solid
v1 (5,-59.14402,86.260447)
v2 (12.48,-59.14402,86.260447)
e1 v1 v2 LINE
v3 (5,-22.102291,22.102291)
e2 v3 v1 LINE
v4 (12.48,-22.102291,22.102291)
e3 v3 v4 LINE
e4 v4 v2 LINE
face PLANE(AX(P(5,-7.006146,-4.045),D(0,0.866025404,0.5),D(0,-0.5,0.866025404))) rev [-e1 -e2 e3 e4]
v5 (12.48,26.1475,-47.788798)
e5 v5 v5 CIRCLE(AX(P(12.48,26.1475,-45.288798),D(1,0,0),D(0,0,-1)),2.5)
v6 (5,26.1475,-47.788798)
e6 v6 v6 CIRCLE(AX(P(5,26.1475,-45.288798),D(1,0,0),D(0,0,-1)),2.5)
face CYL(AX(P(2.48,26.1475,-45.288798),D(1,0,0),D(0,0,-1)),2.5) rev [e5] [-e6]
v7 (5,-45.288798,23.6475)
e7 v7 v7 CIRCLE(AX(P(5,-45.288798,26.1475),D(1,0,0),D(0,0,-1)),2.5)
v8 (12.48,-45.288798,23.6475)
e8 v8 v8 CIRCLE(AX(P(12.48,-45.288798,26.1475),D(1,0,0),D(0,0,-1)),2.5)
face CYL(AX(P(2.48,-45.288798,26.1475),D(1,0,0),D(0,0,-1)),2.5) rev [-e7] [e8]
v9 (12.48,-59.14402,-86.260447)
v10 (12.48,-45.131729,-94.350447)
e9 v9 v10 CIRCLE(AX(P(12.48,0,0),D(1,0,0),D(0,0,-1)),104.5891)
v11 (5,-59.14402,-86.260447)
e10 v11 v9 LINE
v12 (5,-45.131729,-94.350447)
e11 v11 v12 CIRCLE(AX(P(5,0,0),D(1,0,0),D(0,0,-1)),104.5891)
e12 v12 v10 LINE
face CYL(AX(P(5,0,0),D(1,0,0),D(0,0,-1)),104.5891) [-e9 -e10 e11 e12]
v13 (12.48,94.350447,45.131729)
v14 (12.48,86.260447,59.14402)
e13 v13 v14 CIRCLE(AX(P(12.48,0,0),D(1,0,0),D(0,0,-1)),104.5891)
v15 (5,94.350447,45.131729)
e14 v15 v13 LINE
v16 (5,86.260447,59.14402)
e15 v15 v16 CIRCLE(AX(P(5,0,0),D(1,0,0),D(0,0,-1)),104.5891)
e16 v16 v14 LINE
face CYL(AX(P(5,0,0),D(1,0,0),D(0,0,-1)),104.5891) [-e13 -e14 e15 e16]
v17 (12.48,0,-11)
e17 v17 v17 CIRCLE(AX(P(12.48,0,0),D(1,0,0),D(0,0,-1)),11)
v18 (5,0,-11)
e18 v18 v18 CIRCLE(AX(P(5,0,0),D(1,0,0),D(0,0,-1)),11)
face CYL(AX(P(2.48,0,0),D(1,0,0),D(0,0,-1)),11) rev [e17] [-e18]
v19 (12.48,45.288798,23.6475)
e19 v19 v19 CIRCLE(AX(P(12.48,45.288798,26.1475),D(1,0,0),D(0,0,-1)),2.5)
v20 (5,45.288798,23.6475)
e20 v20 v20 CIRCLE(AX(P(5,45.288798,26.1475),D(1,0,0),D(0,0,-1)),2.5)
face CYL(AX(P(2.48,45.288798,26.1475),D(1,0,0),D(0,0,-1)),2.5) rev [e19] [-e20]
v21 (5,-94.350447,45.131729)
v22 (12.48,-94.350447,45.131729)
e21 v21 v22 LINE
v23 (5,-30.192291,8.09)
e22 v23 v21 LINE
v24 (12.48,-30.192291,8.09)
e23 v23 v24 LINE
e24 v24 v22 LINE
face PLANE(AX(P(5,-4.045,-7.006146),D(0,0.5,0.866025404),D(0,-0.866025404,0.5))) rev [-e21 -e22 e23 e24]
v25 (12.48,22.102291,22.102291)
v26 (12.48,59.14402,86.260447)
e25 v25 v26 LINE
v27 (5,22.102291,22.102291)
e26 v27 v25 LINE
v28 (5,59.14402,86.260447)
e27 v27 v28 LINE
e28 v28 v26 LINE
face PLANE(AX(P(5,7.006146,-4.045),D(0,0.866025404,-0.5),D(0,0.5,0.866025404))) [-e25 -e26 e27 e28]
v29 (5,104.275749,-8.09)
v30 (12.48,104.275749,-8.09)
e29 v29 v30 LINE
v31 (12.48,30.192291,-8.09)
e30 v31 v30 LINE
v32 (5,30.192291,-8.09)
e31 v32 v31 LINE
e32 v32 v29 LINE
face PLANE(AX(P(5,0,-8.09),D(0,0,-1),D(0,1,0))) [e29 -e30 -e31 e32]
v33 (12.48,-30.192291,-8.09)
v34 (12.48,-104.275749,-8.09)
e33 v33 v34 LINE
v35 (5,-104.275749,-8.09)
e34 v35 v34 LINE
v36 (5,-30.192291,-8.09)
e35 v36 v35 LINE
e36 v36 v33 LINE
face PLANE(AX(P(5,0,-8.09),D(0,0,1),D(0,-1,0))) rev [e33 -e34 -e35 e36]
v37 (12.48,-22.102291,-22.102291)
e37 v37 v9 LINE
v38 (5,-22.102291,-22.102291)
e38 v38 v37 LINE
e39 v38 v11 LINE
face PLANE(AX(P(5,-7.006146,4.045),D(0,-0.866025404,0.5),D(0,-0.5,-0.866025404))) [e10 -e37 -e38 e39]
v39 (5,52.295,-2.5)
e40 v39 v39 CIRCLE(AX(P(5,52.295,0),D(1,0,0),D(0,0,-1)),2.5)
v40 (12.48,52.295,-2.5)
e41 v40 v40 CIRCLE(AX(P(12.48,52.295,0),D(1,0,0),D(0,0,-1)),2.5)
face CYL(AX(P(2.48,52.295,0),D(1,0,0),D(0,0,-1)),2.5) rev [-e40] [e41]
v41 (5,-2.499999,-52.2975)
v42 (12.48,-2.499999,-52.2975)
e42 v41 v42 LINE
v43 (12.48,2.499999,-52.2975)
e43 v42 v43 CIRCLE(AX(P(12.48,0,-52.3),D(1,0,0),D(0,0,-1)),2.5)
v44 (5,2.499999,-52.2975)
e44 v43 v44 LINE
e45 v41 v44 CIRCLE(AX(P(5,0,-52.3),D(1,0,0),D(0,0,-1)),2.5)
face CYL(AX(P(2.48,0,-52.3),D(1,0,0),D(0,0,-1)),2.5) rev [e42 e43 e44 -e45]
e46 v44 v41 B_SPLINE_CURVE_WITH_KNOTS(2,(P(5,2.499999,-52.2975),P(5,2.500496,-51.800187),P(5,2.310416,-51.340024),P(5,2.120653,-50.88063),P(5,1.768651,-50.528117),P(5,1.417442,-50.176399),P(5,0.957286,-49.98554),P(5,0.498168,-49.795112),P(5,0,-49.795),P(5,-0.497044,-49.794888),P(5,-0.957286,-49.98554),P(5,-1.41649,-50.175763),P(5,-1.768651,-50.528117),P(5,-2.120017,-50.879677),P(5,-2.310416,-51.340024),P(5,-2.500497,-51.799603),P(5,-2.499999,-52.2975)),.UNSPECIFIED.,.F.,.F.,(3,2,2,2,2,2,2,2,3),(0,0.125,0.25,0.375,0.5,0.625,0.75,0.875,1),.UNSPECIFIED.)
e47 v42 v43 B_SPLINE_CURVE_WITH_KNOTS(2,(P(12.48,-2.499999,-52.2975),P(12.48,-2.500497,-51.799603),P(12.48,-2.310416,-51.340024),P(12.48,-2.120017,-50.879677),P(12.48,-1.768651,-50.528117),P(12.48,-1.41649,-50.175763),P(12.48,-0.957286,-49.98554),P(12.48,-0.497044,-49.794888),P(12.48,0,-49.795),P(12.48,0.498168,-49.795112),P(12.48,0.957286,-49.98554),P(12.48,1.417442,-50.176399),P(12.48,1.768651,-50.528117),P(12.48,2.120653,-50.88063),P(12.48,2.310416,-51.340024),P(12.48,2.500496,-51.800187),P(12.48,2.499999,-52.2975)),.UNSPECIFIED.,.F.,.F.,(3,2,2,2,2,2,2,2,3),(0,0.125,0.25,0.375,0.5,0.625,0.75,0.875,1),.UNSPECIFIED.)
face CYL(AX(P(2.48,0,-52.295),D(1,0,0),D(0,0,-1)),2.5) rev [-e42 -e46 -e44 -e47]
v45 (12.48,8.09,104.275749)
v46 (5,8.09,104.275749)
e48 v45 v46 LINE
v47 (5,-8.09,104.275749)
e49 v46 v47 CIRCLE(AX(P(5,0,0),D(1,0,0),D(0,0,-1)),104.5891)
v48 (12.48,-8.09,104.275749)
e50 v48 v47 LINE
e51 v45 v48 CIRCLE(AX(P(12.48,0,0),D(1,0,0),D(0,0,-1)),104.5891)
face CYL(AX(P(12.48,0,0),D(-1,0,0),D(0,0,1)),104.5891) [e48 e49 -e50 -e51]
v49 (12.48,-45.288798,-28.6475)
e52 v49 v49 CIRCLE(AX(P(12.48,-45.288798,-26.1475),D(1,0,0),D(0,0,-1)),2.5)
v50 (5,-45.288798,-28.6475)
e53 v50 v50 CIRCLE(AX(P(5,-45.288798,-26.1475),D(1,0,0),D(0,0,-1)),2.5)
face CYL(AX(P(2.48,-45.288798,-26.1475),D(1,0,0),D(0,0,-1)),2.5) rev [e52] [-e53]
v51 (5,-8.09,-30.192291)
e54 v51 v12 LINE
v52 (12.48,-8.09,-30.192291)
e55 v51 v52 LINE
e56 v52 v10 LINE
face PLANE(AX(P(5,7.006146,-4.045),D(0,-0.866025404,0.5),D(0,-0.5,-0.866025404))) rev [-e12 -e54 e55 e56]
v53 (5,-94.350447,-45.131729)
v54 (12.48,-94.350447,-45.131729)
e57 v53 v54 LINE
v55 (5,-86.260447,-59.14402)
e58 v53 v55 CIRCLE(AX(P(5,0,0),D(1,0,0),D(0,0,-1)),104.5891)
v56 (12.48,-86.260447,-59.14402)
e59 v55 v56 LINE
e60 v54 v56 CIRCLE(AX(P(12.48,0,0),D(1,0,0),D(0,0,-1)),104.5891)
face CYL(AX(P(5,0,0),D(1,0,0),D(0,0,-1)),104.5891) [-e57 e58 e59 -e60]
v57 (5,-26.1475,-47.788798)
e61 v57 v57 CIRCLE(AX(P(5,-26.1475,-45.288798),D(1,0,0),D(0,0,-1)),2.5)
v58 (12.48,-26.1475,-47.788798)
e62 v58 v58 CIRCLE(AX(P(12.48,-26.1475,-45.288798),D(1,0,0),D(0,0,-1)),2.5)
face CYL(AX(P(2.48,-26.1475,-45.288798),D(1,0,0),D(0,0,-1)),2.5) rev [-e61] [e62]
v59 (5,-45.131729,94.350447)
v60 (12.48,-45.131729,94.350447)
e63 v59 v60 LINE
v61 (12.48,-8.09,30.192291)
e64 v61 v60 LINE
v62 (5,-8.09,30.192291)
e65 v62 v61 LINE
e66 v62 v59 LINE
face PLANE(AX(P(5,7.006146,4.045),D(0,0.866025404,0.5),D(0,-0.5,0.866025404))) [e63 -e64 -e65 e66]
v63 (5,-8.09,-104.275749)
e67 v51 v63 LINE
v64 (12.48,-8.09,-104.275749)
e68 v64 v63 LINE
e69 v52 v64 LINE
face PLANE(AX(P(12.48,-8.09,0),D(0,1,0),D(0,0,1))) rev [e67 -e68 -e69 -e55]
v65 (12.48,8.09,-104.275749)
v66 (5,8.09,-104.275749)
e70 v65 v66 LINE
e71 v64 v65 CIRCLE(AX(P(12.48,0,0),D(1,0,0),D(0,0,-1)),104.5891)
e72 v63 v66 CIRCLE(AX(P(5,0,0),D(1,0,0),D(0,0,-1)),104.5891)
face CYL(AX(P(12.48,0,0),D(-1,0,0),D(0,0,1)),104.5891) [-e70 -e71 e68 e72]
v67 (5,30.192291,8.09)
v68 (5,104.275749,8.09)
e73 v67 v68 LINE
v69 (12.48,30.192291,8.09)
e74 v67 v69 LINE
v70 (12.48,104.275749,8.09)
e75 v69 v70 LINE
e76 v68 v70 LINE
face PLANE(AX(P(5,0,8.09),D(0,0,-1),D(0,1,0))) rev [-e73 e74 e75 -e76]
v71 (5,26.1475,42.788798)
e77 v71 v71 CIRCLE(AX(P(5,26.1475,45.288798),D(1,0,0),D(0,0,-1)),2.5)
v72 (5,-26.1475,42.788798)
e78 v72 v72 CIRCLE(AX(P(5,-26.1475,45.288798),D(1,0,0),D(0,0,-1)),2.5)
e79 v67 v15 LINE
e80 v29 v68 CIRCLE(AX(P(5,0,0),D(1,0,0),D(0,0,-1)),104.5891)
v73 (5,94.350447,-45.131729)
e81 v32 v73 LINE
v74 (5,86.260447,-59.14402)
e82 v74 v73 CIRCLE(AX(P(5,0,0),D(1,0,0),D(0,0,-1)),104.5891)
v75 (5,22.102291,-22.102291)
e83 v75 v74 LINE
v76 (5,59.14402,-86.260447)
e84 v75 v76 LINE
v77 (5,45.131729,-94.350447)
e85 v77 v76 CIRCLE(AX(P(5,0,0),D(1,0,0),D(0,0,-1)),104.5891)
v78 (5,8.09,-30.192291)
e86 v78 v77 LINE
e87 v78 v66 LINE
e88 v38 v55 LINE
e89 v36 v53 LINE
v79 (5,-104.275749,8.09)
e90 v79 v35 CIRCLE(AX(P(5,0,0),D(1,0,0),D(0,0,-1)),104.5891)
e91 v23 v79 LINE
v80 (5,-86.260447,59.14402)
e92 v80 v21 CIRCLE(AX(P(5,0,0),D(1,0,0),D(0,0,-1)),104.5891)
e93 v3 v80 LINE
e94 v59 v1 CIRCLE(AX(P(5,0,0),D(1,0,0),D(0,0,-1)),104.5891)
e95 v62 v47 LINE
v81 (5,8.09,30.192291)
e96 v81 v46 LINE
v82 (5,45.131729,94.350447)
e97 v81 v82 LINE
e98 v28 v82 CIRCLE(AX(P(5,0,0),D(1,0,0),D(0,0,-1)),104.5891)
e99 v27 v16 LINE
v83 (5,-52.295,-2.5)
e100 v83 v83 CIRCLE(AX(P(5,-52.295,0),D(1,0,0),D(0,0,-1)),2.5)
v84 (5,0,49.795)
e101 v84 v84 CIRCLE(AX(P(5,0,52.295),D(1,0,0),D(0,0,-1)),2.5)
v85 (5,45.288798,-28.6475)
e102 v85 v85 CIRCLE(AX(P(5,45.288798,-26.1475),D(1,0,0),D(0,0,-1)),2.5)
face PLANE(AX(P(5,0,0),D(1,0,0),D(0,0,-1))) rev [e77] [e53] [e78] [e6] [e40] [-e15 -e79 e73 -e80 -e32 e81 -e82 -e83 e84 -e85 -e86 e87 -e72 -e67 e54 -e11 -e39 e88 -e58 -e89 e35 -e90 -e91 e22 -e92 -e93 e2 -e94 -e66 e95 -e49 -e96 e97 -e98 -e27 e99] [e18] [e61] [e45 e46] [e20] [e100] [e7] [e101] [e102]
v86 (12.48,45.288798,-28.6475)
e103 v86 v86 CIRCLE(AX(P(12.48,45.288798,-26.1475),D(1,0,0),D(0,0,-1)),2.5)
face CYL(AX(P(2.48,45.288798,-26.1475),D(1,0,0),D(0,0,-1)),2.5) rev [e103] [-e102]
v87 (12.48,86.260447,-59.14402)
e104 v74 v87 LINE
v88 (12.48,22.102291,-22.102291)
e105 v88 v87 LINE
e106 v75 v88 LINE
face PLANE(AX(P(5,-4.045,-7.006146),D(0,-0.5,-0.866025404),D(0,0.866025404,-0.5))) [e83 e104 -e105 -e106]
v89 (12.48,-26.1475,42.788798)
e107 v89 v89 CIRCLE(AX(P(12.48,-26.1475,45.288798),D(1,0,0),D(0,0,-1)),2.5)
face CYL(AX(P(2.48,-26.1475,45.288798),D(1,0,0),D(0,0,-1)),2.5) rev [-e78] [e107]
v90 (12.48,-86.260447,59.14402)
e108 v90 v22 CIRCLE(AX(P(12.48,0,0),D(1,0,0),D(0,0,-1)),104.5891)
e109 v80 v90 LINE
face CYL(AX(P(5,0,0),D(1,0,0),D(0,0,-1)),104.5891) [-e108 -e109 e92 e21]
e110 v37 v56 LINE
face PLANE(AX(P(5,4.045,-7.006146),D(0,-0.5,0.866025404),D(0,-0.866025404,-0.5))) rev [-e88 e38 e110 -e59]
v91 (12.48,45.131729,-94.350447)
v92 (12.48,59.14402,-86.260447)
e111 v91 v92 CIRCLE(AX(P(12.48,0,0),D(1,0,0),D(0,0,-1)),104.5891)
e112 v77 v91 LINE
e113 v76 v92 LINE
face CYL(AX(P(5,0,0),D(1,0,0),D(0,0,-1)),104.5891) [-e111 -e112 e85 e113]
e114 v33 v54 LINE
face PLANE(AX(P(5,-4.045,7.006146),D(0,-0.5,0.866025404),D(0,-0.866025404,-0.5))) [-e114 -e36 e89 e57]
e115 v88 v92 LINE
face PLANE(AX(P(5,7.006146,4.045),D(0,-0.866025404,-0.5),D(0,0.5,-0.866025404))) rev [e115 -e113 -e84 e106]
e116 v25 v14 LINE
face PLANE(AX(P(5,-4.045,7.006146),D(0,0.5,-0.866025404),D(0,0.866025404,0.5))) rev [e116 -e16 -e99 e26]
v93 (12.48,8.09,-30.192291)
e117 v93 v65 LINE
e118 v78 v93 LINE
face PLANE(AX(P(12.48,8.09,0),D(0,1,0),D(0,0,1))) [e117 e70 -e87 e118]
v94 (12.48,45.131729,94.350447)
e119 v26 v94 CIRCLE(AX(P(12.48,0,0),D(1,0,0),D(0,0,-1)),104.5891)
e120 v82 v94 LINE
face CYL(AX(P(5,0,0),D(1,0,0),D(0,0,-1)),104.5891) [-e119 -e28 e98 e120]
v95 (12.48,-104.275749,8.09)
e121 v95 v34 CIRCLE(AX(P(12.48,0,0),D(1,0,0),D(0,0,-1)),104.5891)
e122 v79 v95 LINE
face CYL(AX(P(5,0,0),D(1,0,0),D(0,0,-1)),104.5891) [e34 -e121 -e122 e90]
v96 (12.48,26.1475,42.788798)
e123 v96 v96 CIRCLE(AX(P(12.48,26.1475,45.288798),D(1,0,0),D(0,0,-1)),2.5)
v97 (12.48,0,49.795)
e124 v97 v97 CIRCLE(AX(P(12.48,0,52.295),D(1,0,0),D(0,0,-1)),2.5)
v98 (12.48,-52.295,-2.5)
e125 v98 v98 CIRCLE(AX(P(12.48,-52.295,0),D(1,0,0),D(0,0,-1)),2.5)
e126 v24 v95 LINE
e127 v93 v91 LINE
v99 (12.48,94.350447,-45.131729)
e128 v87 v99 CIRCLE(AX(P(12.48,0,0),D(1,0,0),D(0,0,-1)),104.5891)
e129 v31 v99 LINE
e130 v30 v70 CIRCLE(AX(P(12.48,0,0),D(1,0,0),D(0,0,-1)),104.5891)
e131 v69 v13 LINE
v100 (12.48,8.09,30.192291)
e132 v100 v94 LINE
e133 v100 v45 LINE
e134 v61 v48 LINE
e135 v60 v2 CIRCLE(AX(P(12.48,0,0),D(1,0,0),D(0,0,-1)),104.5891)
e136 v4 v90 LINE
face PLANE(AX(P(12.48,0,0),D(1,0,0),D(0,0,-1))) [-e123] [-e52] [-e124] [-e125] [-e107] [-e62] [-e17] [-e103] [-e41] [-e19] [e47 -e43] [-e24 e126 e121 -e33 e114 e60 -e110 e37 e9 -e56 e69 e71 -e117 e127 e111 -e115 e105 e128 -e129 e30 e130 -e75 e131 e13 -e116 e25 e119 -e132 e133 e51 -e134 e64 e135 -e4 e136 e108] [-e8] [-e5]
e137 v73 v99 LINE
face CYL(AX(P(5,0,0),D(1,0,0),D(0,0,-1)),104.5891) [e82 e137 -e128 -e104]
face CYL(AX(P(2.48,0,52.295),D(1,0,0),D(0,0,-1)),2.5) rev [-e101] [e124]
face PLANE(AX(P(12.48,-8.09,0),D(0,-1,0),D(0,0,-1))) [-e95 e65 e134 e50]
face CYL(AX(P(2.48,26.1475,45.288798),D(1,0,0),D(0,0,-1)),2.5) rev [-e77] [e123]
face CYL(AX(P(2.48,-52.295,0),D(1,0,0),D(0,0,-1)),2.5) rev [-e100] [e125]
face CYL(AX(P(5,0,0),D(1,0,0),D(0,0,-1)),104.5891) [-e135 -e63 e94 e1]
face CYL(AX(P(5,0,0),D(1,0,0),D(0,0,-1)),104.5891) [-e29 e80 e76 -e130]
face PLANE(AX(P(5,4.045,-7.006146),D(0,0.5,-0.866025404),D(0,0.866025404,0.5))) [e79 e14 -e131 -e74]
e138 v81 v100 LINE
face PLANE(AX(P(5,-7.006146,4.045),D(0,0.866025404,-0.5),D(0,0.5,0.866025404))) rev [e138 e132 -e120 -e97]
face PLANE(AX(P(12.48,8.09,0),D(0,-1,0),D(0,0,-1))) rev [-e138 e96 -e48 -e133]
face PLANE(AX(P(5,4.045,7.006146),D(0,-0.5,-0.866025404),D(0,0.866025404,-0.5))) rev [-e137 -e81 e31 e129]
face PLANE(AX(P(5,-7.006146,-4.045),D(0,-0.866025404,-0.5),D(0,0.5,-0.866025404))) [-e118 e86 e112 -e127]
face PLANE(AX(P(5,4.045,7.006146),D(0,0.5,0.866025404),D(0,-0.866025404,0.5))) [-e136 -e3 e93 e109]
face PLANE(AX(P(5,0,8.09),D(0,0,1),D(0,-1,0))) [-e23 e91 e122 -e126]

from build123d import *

# Parameters (mm, degrees)
SKETCH1_W           = 450
SKETCH1_H           = 450
BOSS_EXTRUDE1_DEPTH = 5
BOSS_EXTRUDE2_DEPTH = 7.48
BOSS_EXTRUDE3_DEPTH = 7.48
SKETCH6_W           = 450
SKETCH6_H           = 450
CUT_EXTRUDE1_DEPTH  = 5
SKETCH7_R           = 11
SKETCH7_R_2         = 2.5
CUT_EXTRUDE2_DEPTH  = 10
SKETCH8_R           = 209.3091
SKETCH8_R_2         = 104.5891
CUT_EXTRUDE3_DEPTH  = 10
BOSS_EXTRUDE4_DEPTH = 7.48
SKETCH11_R          = 2.5
CUT_EXTRUDE5_DEPTH  = 10
SKETCH12_R          = 20.73675099
SKETCH12_R_2        = 11
BOSS_EXTRUDE5_DEPTH = 7.48


# Read off the part's stored shape, not the designer's step: Boss-Extrude2
with BuildPart() as part:
    # Sketch1 → Boss-Extrude1 (new body)
    with BuildSketch(Plane(origin=(0, 0, 0), x_dir=(0, 0, -1), z_dir=(1, 0, 0))):
        Rectangle(SKETCH1_W, SKETCH1_H)
    extrude(amount=BOSS_EXTRUDE1_DEPTH)

    # Boss-Extrude2 outline → Boss-Extrude2 (add)
    with BuildSketch(Plane(origin=(5, 0, 0), x_dir=(0, 0, -1), z_dir=(1, 0, 0))):
        with BuildLine():
            Line((-164.971757583, 8.09), (-209.152698388, 8.09))
            ThreePointArc((-209.152698388, 8.09), (-209.3091, 0), (-209.152698388, -8.09))
            Line((-209.152698388, -8.09), (-164.971757583, -8.09))
            ThreePointArc((-164.971757583, -8.09), (-116.792827049, -116.792827049), (-8.09, -164.971757583))
            Line((-8.09, -164.971757583), (-8.09, -209.152698388))
            ThreePointArc((-8.09, -209.152698388), (0, -209.3091), (8.09, -209.152698388))
            Line((8.09, -209.152698388), (8.09, -164.971757583))
            ThreePointArc((8.09, -164.971757583), (116.792827049, -116.792827049), (164.971757583, -8.09))
            Line((164.971757583, -8.09), (209.152698388, -8.09))
            ThreePointArc((209.152698388, -8.09), (209.3091, 0), (209.152698388, 8.09))
            Line((209.152698388, 8.09), (164.971757583, 8.09))
            ThreePointArc((164.971757583, 8.09), (116.792827049, 116.792827049), (8.09, 164.971757583))
            Line((8.09, 164.971757583), (8.09, 209.152698388))
            ThreePointArc((8.09, 209.152698388), (0, 209.3091), (-8.09, 209.152698388))
            Line((-8.09, 209.152698388), (-8.09, 164.971757583))
            ThreePointArc((-8.09, 164.971757583), (-116.792827049, 116.792827049), (-164.971757583, 8.09))
        make_face()
        with BuildLine():
            Line((148.770198629, 8.09), (104.538333308, 8.09))
            ThreePointArc((104.538333308, 8.09), (104.8509, 0), (104.538333308, -8.09))
            Line((104.538333308, -8.09), (148.770198629, -8.09))
            ThreePointArc((148.770198629, -8.09), (105.351839329, -105.351839329), (8.09, -148.770198629))
            Line((8.09, -148.770198629), (8.09, -104.538333308))
            ThreePointArc((8.09, -104.538333308), (0, -104.8509), (-8.09, -104.538333308))
            Line((-8.09, -104.538333308), (-8.09, -148.770198629))
            ThreePointArc((-8.09, -148.770198629), (-105.351839329, -105.351839329), (-148.770198629, -8.09))
            Line((-148.770198629, -8.09), (-104.538333308, -8.09))
            ThreePointArc((-104.538333308, -8.09), (-104.8509, 0), (-104.538333308, 8.09))
            Line((-104.538333308, 8.09), (-148.770198629, 8.09))
            ThreePointArc((-148.770198629, 8.09), (-105.351839329, 105.351839329), (-8.09, 148.770198629))
            Line((-8.09, 148.770198629), (-8.09, 104.538333308))
            ThreePointArc((-8.09, 104.538333308), (0, 104.8509), (8.09, 104.538333308))
            Line((8.09, 104.538333308), (8.09, 148.770198629))
            ThreePointArc((8.09, 148.770198629), (105.351839329, 105.351839329), (148.770198629, 8.09))
        make_face(mode=Mode.SUBTRACT)
    extrude(amount=BOSS_EXTRUDE2_DEPTH)

    # Sketch5 → Boss-Extrude3 (add)
    with BuildSketch(Plane(origin=(5, 0, 0), x_dir=(0, 0, -1), z_dir=(1, 0, 0))):
        with BuildLine():
            Line((-19.319547743, 8.09), (-104.275748565, 8.09))
            ThreePointArc((-104.275748565, 8.09), (-104.5891, 0), (-104.275748565, -8.09))
            Line((-104.275748565, -8.09), (-19.319547743, -8.09))
            ThreePointArc((-19.319547743, -8.09), (0, -20.945), (19.319547743, -8.09))
            Line((19.319547743, -8.09), (104.275748565, -8.09))
            ThreePointArc((104.275748565, -8.09), (104.5891, 0), (104.275748565, 8.09))
            Line((104.275748565, 8.09), (19.319547743, 8.09))
            ThreePointArc((19.319547743, 8.09), (0, 20.945), (-19.319547743, 8.09))
        make_face()
    extrude(amount=BOSS_EXTRUDE3_DEPTH)

    # Sketch6 → Cut-Extrude1 (cut)
    with BuildSketch(Plane.ZY):
        Rectangle(SKETCH6_W, SKETCH6_H)
    extrude(amount=-CUT_EXTRUDE1_DEPTH, mode=Mode.SUBTRACT)


with BuildPart() as cut_extrude1_piece_1:
    # of the separate pieces the step leaves, piece 1, a body of its own (cut_extrude1_pieces)
    add(part.part.solids().sort_by_distance((5, 209.152698388, 8.09))[0])


with BuildPart() as cut_extrude1_piece_2:
    # of the separate pieces the step leaves, piece 2, a body of its own (cut_extrude1_pieces)
    add(part.part.solids().sort_by_distance((5, 8.09, -104.275748565))[0])


with BuildPart() as cut_extrude2_tool:
    # Sketch7 → Cut-Extrude2 (new body)
    with BuildSketch(Plane(origin=(12.48, 0, 0), x_dir=(0, 0, -1), z_dir=(1, 0, 0))):
        Circle(SKETCH7_R)
        with Locations((-183.1891, 0)):
            Circle(SKETCH7_R_2)
        with Locations((-130.9659, 0)):
            Circle(SKETCH7_R_2)
        with Locations((0, -183.1891)):
            Circle(SKETCH7_R_2)
        with Locations((0, -130.9659)):
            Circle(SKETCH7_R_2)
        with Locations((183.1891, 0)):
            Circle(SKETCH7_R_2)
        with Locations((52.3, 0)):
            Circle(SKETCH7_R_2)
        with Locations((-52.295, 0)):
            Circle(SKETCH7_R_2)
        with Locations((0, 183.1891)):
            Circle(SKETCH7_R_2)
        with Locations((0, 130.9659)):
            Circle(SKETCH7_R_2)
        with BuildLine():
            Line((-3, 13.8), (-3, 10.583005244))
            ThreePointArc((-3, 10.583005244), (0, 11), (3, 10.583005244))
            Line((3, 10.583005244), (3, 13.8))
            Line((3, 13.8), (-3, 13.8))
        make_face()
        with BuildLine():
            ThreePointArc((3, -10.583005244), (0, -11), (-3, -10.583005244))
            Line((-3, -10.583005244), (-3, -13.8))
            Line((-3, -13.8), (3, -13.8))
            Line((3, -13.8), (3, -10.583005244))
        make_face()
        with Locations((130.9659, 0)):
            Circle(SKETCH7_R_2)
    extrude(amount=-CUT_EXTRUDE2_DEPTH)


with BuildPart() as cut_extrude1_piece_1_1:
    add(cut_extrude1_piece_1.part)

    # Cut-Extrude2: cut by cut_extrude2_tool
    add(cut_extrude2_tool.part, mode=Mode.SUBTRACT)

    # Sketch8 → Cut-Extrude3 (cut)
    with BuildSketch(Plane(origin=(12.48, 0, 0), x_dir=(0, 0, -1), z_dir=(1, 0, 0))):
        Circle(SKETCH8_R)
        Circle(SKETCH8_R_2, mode=Mode.SUBTRACT)
    extrude(amount=-CUT_EXTRUDE3_DEPTH, mode=Mode.SUBTRACT)


with BuildPart() as cut_extrude1_piece_2_1:
    add(cut_extrude1_piece_2.part)

    # Cut-Extrude2: cut by cut_extrude2_tool
    add(cut_extrude2_tool.part, mode=Mode.SUBTRACT)

    # Sketch9 → Boss-Extrude4 (add)
    with BuildSketch(Plane(origin=(12.48, 0, 0), x_dir=(0, 0, -1), z_dir=(1, 0, 0))):
        with BuildLine():
            Line((-94.350447256, 45.131728766), (-30.192291033, 8.09))
            Line((-30.192291033, 8.09), (-19.319547743, 8.09))
            ThreePointArc((-19.319547743, 8.09), (0, 20.945), (19.319547743, 8.09))
            Line((19.319547743, 8.09), (30.192291033, 8.09))
            Line((30.192291033, 8.09), (94.350447256, 45.131728766))
            ThreePointArc((94.350447256, 45.131728766), (90.576817559, 52.29455), (86.260447256, 59.144019799))
            Line((86.260447256, 59.144019799), (22.102291033, 22.102291033))
            Line((22.102291033, 22.102291033), (59.144019799, 86.260447256))
            ThreePointArc((59.144019799, 86.260447256), (52.29455, 90.576817559), (45.131728766, 94.350447256))
            Line((45.131728766, 94.350447256), (8.09, 30.192291033))
            Line((8.09, 30.192291033), (8.09, 104.275748565))
            ThreePointArc((8.09, 104.275748565), (0, 104.5891), (-8.09, 104.275748565))
            Line((-8.09, 104.275748565), (-8.09, 30.192291033))
            Line((-8.09, 30.192291033), (-45.131728766, 94.350447256))
            ThreePointArc((-45.131728766, 94.350447256), (-52.29455, 90.576817559), (-59.144019799, 86.260447256))
            Line((-59.144019799, 86.260447256), (-22.102291033, 22.102291033))
            Line((-22.102291033, 22.102291033), (-86.260447256, 59.144019799))
            ThreePointArc((-86.260447256, 59.144019799), (-90.576817559, 52.29455), (-94.350447256, 45.131728766))
        make_face()
        with BuildLine():
            ThreePointArc((19.319547743, -8.09), (0, -20.945), (-19.319547743, -8.09))
            Line((-19.319547743, -8.09), (-30.192291033, -8.09))
            Line((-30.192291033, -8.09), (-94.350447256, -45.131728766))
            ThreePointArc((-94.350447256, -45.131728766), (-90.576817559, -52.29455), (-86.260447256, -59.144019799))
            Line((-86.260447256, -59.144019799), (-22.102291033, -22.102291033))
            Line((-22.102291033, -22.102291033), (-59.144019799, -86.260447256))
            ThreePointArc((-59.144019799, -86.260447256), (-52.29455, -90.576817559), (-45.131728766, -94.350447256))
            Line((-45.131728766, -94.350447256), (-8.09, -30.192291033))
            Line((-8.09, -30.192291033), (-8.09, -104.275748565))
            ThreePointArc((-8.09, -104.275748565), (0, -104.5891), (8.09, -104.275748565))
            Line((8.09, -104.275748565), (8.09, -30.192291033))
            Line((8.09, -30.192291033), (45.131728766, -94.350447256))
            ThreePointArc((45.131728766, -94.350447256), (52.29455, -90.576817559), (59.144019799, -86.260447256))
            Line((59.144019799, -86.260447256), (22.102291033, -22.102291033))
            Line((22.102291033, -22.102291033), (86.260447256, -59.144019799))
            ThreePointArc((86.260447256, -59.144019799), (90.576817559, -52.29455), (94.350447256, -45.131728766))
            Line((94.350447256, -45.131728766), (30.192291033, -8.09))
            Line((30.192291033, -8.09), (19.319547743, -8.09))
        make_face()
    extrude(amount=-BOSS_EXTRUDE4_DEPTH)

    # Sketch11 → Cut-Extrude5 (cut)
    with BuildSketch(Plane(origin=(12.48, 0, 0), x_dir=(0, 0, -1), z_dir=(1, 0, 0))):
        with Locations((-52.295, 0)):
            Circle(SKETCH11_R)
        with Locations((-45.288798491, 26.1475)):
            Circle(SKETCH11_R)
        with Locations((-26.1475, 45.288798491)):
            Circle(SKETCH11_R)
        with Locations((0, 52.295)):
            Circle(SKETCH11_R)
        with Locations((26.1475, 45.288798491)):
            Circle(SKETCH11_R)
        with Locations((45.288798491, 26.1475)):
            Circle(SKETCH11_R)
        with Locations((52.295, 0)):
            Circle(SKETCH11_R)
        with Locations((45.288798491, -26.1475)):
            Circle(SKETCH11_R)
        with Locations((26.1475, -45.288798491)):
            Circle(SKETCH11_R)
        with Locations((0, -52.295)):
            Circle(SKETCH11_R)
        with Locations((-26.1475, -45.288798491)):
            Circle(SKETCH11_R)
        with Locations((-45.288798491, -26.1475)):
            Circle(SKETCH11_R)
    extrude(amount=-CUT_EXTRUDE5_DEPTH, mode=Mode.SUBTRACT)

    # Sketch12 → Boss-Extrude5 (add)
    with BuildSketch(Plane(origin=(12.48, 0, 0), x_dir=(0, 0, -1), z_dir=(1, 0, 0))):
        Circle(SKETCH12_R)
        Circle(SKETCH12_R_2, mode=Mode.SUBTRACT)
    extrude(amount=-BOSS_EXTRUDE5_DEPTH)


solid = cut_extrude1_piece_2_1.part
